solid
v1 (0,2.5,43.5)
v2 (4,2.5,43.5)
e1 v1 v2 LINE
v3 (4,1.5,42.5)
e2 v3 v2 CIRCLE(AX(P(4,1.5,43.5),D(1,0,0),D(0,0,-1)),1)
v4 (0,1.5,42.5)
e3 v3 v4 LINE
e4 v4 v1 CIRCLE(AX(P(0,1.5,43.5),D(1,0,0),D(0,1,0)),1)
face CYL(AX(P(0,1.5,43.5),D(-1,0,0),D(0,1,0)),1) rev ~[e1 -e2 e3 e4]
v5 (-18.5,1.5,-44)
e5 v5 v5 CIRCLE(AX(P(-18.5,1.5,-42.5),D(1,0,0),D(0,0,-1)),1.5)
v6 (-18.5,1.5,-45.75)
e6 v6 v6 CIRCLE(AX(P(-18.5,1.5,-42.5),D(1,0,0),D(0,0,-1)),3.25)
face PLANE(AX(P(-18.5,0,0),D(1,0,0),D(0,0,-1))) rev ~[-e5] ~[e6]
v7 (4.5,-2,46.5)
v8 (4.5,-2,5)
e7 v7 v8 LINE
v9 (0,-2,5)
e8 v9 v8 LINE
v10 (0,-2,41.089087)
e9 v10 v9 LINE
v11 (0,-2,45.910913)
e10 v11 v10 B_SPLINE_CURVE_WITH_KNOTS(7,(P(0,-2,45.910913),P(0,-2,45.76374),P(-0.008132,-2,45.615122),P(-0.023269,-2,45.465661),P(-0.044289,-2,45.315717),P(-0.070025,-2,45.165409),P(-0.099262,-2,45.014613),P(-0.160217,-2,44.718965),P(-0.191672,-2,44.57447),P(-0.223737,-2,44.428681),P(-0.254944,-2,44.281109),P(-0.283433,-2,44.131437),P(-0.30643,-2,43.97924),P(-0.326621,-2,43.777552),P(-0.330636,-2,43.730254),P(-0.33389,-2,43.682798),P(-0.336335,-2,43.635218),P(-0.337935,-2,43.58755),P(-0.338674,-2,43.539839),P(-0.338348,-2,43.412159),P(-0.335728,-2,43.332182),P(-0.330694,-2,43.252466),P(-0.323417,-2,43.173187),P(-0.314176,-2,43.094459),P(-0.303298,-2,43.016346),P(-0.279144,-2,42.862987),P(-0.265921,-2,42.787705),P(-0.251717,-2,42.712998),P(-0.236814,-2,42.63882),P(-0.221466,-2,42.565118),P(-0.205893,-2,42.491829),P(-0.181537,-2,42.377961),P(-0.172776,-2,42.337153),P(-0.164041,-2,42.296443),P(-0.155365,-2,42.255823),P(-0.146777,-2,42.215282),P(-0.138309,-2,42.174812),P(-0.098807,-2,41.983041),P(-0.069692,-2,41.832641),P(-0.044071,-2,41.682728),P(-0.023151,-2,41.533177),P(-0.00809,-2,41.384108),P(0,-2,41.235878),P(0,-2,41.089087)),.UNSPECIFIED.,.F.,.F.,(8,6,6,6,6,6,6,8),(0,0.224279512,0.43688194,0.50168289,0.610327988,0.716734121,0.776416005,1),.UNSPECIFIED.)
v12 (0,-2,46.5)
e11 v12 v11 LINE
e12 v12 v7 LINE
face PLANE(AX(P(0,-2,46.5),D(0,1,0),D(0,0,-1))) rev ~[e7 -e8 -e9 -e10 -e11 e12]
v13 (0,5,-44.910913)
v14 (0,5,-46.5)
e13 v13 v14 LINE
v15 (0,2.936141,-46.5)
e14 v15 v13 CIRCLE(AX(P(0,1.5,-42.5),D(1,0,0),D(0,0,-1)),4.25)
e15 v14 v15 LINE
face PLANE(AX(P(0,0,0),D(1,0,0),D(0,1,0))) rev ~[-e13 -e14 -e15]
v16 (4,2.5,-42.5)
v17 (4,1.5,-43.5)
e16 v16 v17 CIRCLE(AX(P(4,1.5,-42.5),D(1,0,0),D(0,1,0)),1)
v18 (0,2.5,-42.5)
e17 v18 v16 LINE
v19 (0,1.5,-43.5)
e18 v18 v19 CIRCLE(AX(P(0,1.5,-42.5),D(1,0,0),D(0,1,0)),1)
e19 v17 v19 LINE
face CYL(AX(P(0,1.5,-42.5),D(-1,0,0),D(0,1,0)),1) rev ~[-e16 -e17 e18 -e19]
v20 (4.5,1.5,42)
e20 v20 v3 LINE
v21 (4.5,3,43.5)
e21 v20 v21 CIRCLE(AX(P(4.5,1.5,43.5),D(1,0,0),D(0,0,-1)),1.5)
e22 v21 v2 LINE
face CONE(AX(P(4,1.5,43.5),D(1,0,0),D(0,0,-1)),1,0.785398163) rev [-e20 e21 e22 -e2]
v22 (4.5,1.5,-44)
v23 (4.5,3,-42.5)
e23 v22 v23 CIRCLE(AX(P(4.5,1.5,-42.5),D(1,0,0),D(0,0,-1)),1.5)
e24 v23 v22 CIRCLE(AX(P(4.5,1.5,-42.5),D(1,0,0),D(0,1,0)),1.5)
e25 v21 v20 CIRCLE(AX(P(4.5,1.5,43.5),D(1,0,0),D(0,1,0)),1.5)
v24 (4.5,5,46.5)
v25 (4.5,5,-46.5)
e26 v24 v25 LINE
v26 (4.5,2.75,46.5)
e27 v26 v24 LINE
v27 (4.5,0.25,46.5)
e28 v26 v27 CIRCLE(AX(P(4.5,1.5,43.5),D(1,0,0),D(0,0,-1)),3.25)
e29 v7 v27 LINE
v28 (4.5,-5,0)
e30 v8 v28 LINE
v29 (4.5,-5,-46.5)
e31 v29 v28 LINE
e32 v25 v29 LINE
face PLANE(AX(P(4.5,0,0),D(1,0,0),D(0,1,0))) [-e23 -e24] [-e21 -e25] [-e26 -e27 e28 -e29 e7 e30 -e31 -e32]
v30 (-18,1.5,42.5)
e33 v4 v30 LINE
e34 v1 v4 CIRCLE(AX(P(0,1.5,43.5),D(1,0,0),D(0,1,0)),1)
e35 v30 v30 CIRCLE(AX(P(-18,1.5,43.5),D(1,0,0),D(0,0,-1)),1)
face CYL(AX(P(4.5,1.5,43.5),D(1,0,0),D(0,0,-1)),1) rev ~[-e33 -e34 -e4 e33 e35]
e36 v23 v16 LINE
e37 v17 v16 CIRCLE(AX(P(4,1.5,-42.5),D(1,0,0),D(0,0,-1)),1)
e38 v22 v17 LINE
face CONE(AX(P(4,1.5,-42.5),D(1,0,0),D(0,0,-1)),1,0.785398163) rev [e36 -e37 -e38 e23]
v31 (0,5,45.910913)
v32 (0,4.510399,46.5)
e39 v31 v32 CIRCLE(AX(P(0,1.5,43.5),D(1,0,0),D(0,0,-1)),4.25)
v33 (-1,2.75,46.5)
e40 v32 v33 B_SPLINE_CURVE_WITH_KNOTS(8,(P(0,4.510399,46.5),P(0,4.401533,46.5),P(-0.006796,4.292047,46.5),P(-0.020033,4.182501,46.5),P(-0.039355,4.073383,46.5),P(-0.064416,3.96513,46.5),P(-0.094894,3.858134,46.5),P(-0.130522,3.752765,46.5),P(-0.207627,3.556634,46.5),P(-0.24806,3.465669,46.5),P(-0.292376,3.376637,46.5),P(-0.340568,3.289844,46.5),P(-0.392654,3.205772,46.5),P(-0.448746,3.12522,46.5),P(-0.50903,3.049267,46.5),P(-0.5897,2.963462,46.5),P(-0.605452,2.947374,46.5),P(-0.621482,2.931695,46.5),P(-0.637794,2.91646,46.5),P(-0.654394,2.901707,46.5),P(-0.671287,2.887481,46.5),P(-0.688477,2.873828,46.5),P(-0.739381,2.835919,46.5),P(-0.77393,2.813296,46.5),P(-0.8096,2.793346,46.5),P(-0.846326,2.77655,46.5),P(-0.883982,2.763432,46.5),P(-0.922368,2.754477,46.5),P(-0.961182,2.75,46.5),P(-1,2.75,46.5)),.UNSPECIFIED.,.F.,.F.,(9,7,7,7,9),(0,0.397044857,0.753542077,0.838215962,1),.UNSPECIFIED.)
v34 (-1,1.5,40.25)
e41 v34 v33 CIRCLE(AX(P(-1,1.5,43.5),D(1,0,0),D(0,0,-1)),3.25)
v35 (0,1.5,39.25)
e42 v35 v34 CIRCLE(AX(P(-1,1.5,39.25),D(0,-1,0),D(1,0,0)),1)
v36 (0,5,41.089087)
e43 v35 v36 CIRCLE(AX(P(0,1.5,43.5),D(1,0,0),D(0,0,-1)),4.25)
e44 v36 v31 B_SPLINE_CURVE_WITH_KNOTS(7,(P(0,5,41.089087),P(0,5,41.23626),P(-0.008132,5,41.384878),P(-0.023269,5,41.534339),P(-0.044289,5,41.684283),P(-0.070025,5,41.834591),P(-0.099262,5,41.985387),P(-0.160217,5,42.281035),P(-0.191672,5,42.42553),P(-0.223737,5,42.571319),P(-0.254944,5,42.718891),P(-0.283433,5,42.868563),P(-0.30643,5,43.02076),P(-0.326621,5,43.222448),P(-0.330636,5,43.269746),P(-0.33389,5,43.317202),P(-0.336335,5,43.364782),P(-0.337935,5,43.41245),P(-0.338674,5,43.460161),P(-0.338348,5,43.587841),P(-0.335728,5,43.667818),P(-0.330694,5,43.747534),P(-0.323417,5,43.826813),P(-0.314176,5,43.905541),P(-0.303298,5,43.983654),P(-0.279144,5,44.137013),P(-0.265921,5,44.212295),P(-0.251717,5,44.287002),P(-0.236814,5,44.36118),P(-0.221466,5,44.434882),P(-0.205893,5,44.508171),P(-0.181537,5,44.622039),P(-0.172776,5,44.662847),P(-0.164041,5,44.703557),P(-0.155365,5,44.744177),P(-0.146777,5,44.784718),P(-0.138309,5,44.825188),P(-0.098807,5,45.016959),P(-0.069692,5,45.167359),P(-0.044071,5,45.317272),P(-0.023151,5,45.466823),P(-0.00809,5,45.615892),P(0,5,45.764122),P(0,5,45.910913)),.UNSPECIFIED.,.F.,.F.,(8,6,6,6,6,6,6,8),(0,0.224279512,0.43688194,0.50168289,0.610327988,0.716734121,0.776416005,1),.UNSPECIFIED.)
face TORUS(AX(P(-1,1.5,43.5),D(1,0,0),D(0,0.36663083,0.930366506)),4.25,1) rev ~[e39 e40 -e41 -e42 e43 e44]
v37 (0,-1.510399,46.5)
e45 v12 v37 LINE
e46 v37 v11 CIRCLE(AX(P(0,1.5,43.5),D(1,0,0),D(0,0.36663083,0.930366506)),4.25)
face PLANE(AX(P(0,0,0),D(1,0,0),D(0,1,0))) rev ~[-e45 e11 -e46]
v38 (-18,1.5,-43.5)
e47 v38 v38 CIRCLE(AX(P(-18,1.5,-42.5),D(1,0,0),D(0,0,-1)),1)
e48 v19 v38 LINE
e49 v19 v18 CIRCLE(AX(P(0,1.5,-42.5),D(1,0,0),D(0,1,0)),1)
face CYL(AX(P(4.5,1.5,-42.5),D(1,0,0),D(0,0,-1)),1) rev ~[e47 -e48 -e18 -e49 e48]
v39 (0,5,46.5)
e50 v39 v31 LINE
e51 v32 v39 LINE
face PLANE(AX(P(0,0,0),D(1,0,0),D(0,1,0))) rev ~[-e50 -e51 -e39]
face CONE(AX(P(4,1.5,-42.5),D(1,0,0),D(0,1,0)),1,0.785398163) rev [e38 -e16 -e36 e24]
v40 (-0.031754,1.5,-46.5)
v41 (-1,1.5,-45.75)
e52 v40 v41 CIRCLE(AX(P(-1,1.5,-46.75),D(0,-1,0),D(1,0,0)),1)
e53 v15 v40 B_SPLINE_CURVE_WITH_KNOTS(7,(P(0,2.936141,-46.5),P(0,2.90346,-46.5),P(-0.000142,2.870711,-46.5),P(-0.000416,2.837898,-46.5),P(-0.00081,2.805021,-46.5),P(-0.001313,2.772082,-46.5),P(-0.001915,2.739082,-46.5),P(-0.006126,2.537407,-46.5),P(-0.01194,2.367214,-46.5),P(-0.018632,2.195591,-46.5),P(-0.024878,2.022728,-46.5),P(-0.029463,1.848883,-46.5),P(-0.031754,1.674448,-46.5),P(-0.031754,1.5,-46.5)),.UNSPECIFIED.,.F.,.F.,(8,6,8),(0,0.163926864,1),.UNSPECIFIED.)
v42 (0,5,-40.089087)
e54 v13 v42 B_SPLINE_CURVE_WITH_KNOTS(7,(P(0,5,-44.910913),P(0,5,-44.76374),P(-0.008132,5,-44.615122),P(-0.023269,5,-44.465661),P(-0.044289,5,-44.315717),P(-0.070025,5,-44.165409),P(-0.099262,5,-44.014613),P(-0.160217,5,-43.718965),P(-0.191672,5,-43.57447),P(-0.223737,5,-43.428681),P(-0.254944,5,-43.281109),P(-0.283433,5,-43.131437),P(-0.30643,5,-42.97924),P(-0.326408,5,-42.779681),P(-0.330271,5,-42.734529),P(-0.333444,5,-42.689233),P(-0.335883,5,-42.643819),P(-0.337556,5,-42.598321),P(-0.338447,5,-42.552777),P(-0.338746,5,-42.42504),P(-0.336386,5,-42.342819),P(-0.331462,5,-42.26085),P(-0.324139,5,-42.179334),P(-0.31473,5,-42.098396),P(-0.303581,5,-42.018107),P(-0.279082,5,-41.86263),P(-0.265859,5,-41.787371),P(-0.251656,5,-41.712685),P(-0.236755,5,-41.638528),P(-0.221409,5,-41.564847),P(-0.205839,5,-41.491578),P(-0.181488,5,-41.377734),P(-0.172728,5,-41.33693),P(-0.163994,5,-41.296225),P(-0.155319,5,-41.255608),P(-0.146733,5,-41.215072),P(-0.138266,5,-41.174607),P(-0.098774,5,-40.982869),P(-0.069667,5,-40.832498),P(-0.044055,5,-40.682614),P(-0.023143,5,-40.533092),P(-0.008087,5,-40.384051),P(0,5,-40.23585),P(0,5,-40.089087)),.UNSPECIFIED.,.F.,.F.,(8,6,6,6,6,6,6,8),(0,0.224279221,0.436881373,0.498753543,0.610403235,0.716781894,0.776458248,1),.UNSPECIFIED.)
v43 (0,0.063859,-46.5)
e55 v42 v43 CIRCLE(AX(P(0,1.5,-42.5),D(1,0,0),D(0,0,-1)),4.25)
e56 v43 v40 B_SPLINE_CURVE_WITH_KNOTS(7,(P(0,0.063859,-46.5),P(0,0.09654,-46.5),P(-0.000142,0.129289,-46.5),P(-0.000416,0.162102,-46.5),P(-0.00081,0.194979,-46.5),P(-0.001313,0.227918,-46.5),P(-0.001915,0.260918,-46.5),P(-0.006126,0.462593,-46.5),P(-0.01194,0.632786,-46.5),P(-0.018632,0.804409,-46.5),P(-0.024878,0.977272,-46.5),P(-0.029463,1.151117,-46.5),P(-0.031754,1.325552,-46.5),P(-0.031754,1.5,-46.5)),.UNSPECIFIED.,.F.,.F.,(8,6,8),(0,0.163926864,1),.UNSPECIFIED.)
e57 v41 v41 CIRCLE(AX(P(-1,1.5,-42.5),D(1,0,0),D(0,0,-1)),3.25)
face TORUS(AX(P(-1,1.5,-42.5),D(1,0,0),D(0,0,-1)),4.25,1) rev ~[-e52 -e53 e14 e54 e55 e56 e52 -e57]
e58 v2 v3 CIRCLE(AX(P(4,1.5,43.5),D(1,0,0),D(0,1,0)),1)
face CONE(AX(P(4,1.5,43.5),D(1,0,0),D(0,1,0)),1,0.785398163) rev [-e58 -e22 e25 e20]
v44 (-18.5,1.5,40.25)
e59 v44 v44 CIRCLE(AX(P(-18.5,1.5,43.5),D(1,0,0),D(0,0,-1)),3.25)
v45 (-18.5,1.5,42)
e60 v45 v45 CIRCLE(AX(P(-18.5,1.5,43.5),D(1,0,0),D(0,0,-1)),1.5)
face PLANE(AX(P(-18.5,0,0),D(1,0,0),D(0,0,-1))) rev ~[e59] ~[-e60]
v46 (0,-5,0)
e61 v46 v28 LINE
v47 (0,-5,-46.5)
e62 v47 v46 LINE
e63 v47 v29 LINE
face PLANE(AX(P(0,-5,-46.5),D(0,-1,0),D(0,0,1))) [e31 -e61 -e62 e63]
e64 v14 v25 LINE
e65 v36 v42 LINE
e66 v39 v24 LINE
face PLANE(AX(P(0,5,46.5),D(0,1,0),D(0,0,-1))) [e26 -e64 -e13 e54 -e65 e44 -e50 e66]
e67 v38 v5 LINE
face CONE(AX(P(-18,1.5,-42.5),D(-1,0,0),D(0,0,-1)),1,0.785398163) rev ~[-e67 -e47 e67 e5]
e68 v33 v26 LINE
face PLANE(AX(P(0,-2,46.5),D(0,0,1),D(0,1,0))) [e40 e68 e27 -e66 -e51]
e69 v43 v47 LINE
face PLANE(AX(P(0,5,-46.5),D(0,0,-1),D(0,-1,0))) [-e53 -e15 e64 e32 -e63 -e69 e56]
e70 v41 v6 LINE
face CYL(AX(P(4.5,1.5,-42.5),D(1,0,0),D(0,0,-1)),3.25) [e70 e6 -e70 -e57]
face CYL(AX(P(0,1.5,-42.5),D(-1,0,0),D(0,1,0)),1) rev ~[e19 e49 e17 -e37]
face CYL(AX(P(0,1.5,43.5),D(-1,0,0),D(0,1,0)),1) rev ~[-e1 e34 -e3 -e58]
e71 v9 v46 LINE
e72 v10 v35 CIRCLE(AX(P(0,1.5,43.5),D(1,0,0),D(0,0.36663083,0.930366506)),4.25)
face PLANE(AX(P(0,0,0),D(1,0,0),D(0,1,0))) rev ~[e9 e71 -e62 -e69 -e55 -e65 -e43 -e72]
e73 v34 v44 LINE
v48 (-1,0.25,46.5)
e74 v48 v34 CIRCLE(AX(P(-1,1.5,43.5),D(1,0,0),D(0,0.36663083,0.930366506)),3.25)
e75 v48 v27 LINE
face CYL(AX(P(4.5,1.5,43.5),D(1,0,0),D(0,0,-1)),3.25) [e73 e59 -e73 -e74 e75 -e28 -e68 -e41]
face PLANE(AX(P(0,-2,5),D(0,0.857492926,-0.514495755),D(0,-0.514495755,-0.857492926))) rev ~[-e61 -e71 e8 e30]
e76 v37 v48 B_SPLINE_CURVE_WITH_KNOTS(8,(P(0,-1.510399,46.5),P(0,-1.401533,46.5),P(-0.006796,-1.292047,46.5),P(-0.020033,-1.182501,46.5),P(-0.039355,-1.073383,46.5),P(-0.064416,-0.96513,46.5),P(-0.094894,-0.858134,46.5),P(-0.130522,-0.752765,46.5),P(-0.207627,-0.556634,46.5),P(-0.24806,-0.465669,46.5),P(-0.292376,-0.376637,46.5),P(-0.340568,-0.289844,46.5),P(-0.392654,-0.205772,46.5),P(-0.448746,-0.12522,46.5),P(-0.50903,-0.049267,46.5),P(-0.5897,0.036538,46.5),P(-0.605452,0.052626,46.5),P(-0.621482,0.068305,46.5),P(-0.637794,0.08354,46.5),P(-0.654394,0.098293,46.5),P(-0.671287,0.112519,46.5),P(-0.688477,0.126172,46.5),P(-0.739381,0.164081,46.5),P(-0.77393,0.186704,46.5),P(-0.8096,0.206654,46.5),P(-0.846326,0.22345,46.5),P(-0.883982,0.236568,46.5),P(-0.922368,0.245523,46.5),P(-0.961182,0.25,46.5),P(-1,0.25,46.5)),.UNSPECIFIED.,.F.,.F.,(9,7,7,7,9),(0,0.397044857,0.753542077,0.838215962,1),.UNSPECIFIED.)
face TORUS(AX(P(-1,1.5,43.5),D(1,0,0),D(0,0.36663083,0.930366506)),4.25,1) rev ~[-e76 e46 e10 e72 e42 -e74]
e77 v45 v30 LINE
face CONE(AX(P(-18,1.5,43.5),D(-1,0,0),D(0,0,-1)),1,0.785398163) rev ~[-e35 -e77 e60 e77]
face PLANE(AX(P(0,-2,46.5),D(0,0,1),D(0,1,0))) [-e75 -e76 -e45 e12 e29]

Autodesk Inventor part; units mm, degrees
ref_plane "YZ Plane" through (0, 0, 0) normal (1, 0, 0) x (0, 1, 0)
ref_plane "XZ Plane" through (0, 0, 0) normal (0, 1, 0) x (-1, 0, 0)
ref_plane "XY Plane" through (0, 0, 0) normal (0, 0, 1) x (1, 0, 0)
sketch "Sketch1" plane through (0, 0, 0) normal (1, 0, 0) x (0, 1, 0)
  line L0 (5, -46.5) -> (-5, -46.5)
  line L1 (-5, -46.5) -> (-5, 46.5)
  line L2 (-5, 46.5) -> (5, 46.5)
  line L3 (5, 46.5) -> (5, -46.5)
  line L4 (5, -46.5) -> (-5, 46.5) construction
  line L5 (-5, -46.5) -> (5, 46.5) construction
  circle A0 centre (1.5, 43.5) radius 1
  circle A1 centre (1.5, -42.5) radius 1
  line L6 (-2, 46.5) -> (-2, 5)
  line L7 (-2, 5) -> (-5, 0)
  point P0 (0, 0)
  dimension "d0" = 2
  dimension "d2" = 86
  dimension "d3" = 93
  dimension "d4" = 3.5
  dimension "d5" = 6.5
  dimension "d6" = 4
  dimension "d20" = 3.5
  dimension "d21" = 5
extrude "Extrusion1" add sketch "Sketch1" along normal blind 4.5 contours L0 L1 L7 L6 L2 L3
sketch "Sketch2" plane through (4.5, 0, 0) normal (1, 0, 0) x (0, 0, -1)
  circle A0 centre (-43.5, 1.5) radius 1 projected
  circle A1 centre (-43.5, 1.5) radius 3.25
  circle A2 centre (42.5, 1.5) radius 1 projected
  circle A3 centre (42.5, 1.5) radius 3.25
  point P0 (0, 0)
  dimension "d9" = 6.5
extrude "Extrusion2" add sketch "Sketch2" against normal blind 23
fillet "Fillet1" radius 1 3 edges at (0, -1.6869, 42.8626) (0, 4.6869, 42.8626) (0, 1.5, -39.25)
chamfer "Chamfer1" distance 0.5 angle 45 6 edges at (4.5, 0.7929, 44.2071) (4.5, 2.2071, 42.7929) (4.5, 2.2071, -43.2071) (4.5, 0.7929, -41.7929) (-18.5, 1.5, -41.5) (-18.5, 1.5, 44.5)
properties part number "PCB_support"
